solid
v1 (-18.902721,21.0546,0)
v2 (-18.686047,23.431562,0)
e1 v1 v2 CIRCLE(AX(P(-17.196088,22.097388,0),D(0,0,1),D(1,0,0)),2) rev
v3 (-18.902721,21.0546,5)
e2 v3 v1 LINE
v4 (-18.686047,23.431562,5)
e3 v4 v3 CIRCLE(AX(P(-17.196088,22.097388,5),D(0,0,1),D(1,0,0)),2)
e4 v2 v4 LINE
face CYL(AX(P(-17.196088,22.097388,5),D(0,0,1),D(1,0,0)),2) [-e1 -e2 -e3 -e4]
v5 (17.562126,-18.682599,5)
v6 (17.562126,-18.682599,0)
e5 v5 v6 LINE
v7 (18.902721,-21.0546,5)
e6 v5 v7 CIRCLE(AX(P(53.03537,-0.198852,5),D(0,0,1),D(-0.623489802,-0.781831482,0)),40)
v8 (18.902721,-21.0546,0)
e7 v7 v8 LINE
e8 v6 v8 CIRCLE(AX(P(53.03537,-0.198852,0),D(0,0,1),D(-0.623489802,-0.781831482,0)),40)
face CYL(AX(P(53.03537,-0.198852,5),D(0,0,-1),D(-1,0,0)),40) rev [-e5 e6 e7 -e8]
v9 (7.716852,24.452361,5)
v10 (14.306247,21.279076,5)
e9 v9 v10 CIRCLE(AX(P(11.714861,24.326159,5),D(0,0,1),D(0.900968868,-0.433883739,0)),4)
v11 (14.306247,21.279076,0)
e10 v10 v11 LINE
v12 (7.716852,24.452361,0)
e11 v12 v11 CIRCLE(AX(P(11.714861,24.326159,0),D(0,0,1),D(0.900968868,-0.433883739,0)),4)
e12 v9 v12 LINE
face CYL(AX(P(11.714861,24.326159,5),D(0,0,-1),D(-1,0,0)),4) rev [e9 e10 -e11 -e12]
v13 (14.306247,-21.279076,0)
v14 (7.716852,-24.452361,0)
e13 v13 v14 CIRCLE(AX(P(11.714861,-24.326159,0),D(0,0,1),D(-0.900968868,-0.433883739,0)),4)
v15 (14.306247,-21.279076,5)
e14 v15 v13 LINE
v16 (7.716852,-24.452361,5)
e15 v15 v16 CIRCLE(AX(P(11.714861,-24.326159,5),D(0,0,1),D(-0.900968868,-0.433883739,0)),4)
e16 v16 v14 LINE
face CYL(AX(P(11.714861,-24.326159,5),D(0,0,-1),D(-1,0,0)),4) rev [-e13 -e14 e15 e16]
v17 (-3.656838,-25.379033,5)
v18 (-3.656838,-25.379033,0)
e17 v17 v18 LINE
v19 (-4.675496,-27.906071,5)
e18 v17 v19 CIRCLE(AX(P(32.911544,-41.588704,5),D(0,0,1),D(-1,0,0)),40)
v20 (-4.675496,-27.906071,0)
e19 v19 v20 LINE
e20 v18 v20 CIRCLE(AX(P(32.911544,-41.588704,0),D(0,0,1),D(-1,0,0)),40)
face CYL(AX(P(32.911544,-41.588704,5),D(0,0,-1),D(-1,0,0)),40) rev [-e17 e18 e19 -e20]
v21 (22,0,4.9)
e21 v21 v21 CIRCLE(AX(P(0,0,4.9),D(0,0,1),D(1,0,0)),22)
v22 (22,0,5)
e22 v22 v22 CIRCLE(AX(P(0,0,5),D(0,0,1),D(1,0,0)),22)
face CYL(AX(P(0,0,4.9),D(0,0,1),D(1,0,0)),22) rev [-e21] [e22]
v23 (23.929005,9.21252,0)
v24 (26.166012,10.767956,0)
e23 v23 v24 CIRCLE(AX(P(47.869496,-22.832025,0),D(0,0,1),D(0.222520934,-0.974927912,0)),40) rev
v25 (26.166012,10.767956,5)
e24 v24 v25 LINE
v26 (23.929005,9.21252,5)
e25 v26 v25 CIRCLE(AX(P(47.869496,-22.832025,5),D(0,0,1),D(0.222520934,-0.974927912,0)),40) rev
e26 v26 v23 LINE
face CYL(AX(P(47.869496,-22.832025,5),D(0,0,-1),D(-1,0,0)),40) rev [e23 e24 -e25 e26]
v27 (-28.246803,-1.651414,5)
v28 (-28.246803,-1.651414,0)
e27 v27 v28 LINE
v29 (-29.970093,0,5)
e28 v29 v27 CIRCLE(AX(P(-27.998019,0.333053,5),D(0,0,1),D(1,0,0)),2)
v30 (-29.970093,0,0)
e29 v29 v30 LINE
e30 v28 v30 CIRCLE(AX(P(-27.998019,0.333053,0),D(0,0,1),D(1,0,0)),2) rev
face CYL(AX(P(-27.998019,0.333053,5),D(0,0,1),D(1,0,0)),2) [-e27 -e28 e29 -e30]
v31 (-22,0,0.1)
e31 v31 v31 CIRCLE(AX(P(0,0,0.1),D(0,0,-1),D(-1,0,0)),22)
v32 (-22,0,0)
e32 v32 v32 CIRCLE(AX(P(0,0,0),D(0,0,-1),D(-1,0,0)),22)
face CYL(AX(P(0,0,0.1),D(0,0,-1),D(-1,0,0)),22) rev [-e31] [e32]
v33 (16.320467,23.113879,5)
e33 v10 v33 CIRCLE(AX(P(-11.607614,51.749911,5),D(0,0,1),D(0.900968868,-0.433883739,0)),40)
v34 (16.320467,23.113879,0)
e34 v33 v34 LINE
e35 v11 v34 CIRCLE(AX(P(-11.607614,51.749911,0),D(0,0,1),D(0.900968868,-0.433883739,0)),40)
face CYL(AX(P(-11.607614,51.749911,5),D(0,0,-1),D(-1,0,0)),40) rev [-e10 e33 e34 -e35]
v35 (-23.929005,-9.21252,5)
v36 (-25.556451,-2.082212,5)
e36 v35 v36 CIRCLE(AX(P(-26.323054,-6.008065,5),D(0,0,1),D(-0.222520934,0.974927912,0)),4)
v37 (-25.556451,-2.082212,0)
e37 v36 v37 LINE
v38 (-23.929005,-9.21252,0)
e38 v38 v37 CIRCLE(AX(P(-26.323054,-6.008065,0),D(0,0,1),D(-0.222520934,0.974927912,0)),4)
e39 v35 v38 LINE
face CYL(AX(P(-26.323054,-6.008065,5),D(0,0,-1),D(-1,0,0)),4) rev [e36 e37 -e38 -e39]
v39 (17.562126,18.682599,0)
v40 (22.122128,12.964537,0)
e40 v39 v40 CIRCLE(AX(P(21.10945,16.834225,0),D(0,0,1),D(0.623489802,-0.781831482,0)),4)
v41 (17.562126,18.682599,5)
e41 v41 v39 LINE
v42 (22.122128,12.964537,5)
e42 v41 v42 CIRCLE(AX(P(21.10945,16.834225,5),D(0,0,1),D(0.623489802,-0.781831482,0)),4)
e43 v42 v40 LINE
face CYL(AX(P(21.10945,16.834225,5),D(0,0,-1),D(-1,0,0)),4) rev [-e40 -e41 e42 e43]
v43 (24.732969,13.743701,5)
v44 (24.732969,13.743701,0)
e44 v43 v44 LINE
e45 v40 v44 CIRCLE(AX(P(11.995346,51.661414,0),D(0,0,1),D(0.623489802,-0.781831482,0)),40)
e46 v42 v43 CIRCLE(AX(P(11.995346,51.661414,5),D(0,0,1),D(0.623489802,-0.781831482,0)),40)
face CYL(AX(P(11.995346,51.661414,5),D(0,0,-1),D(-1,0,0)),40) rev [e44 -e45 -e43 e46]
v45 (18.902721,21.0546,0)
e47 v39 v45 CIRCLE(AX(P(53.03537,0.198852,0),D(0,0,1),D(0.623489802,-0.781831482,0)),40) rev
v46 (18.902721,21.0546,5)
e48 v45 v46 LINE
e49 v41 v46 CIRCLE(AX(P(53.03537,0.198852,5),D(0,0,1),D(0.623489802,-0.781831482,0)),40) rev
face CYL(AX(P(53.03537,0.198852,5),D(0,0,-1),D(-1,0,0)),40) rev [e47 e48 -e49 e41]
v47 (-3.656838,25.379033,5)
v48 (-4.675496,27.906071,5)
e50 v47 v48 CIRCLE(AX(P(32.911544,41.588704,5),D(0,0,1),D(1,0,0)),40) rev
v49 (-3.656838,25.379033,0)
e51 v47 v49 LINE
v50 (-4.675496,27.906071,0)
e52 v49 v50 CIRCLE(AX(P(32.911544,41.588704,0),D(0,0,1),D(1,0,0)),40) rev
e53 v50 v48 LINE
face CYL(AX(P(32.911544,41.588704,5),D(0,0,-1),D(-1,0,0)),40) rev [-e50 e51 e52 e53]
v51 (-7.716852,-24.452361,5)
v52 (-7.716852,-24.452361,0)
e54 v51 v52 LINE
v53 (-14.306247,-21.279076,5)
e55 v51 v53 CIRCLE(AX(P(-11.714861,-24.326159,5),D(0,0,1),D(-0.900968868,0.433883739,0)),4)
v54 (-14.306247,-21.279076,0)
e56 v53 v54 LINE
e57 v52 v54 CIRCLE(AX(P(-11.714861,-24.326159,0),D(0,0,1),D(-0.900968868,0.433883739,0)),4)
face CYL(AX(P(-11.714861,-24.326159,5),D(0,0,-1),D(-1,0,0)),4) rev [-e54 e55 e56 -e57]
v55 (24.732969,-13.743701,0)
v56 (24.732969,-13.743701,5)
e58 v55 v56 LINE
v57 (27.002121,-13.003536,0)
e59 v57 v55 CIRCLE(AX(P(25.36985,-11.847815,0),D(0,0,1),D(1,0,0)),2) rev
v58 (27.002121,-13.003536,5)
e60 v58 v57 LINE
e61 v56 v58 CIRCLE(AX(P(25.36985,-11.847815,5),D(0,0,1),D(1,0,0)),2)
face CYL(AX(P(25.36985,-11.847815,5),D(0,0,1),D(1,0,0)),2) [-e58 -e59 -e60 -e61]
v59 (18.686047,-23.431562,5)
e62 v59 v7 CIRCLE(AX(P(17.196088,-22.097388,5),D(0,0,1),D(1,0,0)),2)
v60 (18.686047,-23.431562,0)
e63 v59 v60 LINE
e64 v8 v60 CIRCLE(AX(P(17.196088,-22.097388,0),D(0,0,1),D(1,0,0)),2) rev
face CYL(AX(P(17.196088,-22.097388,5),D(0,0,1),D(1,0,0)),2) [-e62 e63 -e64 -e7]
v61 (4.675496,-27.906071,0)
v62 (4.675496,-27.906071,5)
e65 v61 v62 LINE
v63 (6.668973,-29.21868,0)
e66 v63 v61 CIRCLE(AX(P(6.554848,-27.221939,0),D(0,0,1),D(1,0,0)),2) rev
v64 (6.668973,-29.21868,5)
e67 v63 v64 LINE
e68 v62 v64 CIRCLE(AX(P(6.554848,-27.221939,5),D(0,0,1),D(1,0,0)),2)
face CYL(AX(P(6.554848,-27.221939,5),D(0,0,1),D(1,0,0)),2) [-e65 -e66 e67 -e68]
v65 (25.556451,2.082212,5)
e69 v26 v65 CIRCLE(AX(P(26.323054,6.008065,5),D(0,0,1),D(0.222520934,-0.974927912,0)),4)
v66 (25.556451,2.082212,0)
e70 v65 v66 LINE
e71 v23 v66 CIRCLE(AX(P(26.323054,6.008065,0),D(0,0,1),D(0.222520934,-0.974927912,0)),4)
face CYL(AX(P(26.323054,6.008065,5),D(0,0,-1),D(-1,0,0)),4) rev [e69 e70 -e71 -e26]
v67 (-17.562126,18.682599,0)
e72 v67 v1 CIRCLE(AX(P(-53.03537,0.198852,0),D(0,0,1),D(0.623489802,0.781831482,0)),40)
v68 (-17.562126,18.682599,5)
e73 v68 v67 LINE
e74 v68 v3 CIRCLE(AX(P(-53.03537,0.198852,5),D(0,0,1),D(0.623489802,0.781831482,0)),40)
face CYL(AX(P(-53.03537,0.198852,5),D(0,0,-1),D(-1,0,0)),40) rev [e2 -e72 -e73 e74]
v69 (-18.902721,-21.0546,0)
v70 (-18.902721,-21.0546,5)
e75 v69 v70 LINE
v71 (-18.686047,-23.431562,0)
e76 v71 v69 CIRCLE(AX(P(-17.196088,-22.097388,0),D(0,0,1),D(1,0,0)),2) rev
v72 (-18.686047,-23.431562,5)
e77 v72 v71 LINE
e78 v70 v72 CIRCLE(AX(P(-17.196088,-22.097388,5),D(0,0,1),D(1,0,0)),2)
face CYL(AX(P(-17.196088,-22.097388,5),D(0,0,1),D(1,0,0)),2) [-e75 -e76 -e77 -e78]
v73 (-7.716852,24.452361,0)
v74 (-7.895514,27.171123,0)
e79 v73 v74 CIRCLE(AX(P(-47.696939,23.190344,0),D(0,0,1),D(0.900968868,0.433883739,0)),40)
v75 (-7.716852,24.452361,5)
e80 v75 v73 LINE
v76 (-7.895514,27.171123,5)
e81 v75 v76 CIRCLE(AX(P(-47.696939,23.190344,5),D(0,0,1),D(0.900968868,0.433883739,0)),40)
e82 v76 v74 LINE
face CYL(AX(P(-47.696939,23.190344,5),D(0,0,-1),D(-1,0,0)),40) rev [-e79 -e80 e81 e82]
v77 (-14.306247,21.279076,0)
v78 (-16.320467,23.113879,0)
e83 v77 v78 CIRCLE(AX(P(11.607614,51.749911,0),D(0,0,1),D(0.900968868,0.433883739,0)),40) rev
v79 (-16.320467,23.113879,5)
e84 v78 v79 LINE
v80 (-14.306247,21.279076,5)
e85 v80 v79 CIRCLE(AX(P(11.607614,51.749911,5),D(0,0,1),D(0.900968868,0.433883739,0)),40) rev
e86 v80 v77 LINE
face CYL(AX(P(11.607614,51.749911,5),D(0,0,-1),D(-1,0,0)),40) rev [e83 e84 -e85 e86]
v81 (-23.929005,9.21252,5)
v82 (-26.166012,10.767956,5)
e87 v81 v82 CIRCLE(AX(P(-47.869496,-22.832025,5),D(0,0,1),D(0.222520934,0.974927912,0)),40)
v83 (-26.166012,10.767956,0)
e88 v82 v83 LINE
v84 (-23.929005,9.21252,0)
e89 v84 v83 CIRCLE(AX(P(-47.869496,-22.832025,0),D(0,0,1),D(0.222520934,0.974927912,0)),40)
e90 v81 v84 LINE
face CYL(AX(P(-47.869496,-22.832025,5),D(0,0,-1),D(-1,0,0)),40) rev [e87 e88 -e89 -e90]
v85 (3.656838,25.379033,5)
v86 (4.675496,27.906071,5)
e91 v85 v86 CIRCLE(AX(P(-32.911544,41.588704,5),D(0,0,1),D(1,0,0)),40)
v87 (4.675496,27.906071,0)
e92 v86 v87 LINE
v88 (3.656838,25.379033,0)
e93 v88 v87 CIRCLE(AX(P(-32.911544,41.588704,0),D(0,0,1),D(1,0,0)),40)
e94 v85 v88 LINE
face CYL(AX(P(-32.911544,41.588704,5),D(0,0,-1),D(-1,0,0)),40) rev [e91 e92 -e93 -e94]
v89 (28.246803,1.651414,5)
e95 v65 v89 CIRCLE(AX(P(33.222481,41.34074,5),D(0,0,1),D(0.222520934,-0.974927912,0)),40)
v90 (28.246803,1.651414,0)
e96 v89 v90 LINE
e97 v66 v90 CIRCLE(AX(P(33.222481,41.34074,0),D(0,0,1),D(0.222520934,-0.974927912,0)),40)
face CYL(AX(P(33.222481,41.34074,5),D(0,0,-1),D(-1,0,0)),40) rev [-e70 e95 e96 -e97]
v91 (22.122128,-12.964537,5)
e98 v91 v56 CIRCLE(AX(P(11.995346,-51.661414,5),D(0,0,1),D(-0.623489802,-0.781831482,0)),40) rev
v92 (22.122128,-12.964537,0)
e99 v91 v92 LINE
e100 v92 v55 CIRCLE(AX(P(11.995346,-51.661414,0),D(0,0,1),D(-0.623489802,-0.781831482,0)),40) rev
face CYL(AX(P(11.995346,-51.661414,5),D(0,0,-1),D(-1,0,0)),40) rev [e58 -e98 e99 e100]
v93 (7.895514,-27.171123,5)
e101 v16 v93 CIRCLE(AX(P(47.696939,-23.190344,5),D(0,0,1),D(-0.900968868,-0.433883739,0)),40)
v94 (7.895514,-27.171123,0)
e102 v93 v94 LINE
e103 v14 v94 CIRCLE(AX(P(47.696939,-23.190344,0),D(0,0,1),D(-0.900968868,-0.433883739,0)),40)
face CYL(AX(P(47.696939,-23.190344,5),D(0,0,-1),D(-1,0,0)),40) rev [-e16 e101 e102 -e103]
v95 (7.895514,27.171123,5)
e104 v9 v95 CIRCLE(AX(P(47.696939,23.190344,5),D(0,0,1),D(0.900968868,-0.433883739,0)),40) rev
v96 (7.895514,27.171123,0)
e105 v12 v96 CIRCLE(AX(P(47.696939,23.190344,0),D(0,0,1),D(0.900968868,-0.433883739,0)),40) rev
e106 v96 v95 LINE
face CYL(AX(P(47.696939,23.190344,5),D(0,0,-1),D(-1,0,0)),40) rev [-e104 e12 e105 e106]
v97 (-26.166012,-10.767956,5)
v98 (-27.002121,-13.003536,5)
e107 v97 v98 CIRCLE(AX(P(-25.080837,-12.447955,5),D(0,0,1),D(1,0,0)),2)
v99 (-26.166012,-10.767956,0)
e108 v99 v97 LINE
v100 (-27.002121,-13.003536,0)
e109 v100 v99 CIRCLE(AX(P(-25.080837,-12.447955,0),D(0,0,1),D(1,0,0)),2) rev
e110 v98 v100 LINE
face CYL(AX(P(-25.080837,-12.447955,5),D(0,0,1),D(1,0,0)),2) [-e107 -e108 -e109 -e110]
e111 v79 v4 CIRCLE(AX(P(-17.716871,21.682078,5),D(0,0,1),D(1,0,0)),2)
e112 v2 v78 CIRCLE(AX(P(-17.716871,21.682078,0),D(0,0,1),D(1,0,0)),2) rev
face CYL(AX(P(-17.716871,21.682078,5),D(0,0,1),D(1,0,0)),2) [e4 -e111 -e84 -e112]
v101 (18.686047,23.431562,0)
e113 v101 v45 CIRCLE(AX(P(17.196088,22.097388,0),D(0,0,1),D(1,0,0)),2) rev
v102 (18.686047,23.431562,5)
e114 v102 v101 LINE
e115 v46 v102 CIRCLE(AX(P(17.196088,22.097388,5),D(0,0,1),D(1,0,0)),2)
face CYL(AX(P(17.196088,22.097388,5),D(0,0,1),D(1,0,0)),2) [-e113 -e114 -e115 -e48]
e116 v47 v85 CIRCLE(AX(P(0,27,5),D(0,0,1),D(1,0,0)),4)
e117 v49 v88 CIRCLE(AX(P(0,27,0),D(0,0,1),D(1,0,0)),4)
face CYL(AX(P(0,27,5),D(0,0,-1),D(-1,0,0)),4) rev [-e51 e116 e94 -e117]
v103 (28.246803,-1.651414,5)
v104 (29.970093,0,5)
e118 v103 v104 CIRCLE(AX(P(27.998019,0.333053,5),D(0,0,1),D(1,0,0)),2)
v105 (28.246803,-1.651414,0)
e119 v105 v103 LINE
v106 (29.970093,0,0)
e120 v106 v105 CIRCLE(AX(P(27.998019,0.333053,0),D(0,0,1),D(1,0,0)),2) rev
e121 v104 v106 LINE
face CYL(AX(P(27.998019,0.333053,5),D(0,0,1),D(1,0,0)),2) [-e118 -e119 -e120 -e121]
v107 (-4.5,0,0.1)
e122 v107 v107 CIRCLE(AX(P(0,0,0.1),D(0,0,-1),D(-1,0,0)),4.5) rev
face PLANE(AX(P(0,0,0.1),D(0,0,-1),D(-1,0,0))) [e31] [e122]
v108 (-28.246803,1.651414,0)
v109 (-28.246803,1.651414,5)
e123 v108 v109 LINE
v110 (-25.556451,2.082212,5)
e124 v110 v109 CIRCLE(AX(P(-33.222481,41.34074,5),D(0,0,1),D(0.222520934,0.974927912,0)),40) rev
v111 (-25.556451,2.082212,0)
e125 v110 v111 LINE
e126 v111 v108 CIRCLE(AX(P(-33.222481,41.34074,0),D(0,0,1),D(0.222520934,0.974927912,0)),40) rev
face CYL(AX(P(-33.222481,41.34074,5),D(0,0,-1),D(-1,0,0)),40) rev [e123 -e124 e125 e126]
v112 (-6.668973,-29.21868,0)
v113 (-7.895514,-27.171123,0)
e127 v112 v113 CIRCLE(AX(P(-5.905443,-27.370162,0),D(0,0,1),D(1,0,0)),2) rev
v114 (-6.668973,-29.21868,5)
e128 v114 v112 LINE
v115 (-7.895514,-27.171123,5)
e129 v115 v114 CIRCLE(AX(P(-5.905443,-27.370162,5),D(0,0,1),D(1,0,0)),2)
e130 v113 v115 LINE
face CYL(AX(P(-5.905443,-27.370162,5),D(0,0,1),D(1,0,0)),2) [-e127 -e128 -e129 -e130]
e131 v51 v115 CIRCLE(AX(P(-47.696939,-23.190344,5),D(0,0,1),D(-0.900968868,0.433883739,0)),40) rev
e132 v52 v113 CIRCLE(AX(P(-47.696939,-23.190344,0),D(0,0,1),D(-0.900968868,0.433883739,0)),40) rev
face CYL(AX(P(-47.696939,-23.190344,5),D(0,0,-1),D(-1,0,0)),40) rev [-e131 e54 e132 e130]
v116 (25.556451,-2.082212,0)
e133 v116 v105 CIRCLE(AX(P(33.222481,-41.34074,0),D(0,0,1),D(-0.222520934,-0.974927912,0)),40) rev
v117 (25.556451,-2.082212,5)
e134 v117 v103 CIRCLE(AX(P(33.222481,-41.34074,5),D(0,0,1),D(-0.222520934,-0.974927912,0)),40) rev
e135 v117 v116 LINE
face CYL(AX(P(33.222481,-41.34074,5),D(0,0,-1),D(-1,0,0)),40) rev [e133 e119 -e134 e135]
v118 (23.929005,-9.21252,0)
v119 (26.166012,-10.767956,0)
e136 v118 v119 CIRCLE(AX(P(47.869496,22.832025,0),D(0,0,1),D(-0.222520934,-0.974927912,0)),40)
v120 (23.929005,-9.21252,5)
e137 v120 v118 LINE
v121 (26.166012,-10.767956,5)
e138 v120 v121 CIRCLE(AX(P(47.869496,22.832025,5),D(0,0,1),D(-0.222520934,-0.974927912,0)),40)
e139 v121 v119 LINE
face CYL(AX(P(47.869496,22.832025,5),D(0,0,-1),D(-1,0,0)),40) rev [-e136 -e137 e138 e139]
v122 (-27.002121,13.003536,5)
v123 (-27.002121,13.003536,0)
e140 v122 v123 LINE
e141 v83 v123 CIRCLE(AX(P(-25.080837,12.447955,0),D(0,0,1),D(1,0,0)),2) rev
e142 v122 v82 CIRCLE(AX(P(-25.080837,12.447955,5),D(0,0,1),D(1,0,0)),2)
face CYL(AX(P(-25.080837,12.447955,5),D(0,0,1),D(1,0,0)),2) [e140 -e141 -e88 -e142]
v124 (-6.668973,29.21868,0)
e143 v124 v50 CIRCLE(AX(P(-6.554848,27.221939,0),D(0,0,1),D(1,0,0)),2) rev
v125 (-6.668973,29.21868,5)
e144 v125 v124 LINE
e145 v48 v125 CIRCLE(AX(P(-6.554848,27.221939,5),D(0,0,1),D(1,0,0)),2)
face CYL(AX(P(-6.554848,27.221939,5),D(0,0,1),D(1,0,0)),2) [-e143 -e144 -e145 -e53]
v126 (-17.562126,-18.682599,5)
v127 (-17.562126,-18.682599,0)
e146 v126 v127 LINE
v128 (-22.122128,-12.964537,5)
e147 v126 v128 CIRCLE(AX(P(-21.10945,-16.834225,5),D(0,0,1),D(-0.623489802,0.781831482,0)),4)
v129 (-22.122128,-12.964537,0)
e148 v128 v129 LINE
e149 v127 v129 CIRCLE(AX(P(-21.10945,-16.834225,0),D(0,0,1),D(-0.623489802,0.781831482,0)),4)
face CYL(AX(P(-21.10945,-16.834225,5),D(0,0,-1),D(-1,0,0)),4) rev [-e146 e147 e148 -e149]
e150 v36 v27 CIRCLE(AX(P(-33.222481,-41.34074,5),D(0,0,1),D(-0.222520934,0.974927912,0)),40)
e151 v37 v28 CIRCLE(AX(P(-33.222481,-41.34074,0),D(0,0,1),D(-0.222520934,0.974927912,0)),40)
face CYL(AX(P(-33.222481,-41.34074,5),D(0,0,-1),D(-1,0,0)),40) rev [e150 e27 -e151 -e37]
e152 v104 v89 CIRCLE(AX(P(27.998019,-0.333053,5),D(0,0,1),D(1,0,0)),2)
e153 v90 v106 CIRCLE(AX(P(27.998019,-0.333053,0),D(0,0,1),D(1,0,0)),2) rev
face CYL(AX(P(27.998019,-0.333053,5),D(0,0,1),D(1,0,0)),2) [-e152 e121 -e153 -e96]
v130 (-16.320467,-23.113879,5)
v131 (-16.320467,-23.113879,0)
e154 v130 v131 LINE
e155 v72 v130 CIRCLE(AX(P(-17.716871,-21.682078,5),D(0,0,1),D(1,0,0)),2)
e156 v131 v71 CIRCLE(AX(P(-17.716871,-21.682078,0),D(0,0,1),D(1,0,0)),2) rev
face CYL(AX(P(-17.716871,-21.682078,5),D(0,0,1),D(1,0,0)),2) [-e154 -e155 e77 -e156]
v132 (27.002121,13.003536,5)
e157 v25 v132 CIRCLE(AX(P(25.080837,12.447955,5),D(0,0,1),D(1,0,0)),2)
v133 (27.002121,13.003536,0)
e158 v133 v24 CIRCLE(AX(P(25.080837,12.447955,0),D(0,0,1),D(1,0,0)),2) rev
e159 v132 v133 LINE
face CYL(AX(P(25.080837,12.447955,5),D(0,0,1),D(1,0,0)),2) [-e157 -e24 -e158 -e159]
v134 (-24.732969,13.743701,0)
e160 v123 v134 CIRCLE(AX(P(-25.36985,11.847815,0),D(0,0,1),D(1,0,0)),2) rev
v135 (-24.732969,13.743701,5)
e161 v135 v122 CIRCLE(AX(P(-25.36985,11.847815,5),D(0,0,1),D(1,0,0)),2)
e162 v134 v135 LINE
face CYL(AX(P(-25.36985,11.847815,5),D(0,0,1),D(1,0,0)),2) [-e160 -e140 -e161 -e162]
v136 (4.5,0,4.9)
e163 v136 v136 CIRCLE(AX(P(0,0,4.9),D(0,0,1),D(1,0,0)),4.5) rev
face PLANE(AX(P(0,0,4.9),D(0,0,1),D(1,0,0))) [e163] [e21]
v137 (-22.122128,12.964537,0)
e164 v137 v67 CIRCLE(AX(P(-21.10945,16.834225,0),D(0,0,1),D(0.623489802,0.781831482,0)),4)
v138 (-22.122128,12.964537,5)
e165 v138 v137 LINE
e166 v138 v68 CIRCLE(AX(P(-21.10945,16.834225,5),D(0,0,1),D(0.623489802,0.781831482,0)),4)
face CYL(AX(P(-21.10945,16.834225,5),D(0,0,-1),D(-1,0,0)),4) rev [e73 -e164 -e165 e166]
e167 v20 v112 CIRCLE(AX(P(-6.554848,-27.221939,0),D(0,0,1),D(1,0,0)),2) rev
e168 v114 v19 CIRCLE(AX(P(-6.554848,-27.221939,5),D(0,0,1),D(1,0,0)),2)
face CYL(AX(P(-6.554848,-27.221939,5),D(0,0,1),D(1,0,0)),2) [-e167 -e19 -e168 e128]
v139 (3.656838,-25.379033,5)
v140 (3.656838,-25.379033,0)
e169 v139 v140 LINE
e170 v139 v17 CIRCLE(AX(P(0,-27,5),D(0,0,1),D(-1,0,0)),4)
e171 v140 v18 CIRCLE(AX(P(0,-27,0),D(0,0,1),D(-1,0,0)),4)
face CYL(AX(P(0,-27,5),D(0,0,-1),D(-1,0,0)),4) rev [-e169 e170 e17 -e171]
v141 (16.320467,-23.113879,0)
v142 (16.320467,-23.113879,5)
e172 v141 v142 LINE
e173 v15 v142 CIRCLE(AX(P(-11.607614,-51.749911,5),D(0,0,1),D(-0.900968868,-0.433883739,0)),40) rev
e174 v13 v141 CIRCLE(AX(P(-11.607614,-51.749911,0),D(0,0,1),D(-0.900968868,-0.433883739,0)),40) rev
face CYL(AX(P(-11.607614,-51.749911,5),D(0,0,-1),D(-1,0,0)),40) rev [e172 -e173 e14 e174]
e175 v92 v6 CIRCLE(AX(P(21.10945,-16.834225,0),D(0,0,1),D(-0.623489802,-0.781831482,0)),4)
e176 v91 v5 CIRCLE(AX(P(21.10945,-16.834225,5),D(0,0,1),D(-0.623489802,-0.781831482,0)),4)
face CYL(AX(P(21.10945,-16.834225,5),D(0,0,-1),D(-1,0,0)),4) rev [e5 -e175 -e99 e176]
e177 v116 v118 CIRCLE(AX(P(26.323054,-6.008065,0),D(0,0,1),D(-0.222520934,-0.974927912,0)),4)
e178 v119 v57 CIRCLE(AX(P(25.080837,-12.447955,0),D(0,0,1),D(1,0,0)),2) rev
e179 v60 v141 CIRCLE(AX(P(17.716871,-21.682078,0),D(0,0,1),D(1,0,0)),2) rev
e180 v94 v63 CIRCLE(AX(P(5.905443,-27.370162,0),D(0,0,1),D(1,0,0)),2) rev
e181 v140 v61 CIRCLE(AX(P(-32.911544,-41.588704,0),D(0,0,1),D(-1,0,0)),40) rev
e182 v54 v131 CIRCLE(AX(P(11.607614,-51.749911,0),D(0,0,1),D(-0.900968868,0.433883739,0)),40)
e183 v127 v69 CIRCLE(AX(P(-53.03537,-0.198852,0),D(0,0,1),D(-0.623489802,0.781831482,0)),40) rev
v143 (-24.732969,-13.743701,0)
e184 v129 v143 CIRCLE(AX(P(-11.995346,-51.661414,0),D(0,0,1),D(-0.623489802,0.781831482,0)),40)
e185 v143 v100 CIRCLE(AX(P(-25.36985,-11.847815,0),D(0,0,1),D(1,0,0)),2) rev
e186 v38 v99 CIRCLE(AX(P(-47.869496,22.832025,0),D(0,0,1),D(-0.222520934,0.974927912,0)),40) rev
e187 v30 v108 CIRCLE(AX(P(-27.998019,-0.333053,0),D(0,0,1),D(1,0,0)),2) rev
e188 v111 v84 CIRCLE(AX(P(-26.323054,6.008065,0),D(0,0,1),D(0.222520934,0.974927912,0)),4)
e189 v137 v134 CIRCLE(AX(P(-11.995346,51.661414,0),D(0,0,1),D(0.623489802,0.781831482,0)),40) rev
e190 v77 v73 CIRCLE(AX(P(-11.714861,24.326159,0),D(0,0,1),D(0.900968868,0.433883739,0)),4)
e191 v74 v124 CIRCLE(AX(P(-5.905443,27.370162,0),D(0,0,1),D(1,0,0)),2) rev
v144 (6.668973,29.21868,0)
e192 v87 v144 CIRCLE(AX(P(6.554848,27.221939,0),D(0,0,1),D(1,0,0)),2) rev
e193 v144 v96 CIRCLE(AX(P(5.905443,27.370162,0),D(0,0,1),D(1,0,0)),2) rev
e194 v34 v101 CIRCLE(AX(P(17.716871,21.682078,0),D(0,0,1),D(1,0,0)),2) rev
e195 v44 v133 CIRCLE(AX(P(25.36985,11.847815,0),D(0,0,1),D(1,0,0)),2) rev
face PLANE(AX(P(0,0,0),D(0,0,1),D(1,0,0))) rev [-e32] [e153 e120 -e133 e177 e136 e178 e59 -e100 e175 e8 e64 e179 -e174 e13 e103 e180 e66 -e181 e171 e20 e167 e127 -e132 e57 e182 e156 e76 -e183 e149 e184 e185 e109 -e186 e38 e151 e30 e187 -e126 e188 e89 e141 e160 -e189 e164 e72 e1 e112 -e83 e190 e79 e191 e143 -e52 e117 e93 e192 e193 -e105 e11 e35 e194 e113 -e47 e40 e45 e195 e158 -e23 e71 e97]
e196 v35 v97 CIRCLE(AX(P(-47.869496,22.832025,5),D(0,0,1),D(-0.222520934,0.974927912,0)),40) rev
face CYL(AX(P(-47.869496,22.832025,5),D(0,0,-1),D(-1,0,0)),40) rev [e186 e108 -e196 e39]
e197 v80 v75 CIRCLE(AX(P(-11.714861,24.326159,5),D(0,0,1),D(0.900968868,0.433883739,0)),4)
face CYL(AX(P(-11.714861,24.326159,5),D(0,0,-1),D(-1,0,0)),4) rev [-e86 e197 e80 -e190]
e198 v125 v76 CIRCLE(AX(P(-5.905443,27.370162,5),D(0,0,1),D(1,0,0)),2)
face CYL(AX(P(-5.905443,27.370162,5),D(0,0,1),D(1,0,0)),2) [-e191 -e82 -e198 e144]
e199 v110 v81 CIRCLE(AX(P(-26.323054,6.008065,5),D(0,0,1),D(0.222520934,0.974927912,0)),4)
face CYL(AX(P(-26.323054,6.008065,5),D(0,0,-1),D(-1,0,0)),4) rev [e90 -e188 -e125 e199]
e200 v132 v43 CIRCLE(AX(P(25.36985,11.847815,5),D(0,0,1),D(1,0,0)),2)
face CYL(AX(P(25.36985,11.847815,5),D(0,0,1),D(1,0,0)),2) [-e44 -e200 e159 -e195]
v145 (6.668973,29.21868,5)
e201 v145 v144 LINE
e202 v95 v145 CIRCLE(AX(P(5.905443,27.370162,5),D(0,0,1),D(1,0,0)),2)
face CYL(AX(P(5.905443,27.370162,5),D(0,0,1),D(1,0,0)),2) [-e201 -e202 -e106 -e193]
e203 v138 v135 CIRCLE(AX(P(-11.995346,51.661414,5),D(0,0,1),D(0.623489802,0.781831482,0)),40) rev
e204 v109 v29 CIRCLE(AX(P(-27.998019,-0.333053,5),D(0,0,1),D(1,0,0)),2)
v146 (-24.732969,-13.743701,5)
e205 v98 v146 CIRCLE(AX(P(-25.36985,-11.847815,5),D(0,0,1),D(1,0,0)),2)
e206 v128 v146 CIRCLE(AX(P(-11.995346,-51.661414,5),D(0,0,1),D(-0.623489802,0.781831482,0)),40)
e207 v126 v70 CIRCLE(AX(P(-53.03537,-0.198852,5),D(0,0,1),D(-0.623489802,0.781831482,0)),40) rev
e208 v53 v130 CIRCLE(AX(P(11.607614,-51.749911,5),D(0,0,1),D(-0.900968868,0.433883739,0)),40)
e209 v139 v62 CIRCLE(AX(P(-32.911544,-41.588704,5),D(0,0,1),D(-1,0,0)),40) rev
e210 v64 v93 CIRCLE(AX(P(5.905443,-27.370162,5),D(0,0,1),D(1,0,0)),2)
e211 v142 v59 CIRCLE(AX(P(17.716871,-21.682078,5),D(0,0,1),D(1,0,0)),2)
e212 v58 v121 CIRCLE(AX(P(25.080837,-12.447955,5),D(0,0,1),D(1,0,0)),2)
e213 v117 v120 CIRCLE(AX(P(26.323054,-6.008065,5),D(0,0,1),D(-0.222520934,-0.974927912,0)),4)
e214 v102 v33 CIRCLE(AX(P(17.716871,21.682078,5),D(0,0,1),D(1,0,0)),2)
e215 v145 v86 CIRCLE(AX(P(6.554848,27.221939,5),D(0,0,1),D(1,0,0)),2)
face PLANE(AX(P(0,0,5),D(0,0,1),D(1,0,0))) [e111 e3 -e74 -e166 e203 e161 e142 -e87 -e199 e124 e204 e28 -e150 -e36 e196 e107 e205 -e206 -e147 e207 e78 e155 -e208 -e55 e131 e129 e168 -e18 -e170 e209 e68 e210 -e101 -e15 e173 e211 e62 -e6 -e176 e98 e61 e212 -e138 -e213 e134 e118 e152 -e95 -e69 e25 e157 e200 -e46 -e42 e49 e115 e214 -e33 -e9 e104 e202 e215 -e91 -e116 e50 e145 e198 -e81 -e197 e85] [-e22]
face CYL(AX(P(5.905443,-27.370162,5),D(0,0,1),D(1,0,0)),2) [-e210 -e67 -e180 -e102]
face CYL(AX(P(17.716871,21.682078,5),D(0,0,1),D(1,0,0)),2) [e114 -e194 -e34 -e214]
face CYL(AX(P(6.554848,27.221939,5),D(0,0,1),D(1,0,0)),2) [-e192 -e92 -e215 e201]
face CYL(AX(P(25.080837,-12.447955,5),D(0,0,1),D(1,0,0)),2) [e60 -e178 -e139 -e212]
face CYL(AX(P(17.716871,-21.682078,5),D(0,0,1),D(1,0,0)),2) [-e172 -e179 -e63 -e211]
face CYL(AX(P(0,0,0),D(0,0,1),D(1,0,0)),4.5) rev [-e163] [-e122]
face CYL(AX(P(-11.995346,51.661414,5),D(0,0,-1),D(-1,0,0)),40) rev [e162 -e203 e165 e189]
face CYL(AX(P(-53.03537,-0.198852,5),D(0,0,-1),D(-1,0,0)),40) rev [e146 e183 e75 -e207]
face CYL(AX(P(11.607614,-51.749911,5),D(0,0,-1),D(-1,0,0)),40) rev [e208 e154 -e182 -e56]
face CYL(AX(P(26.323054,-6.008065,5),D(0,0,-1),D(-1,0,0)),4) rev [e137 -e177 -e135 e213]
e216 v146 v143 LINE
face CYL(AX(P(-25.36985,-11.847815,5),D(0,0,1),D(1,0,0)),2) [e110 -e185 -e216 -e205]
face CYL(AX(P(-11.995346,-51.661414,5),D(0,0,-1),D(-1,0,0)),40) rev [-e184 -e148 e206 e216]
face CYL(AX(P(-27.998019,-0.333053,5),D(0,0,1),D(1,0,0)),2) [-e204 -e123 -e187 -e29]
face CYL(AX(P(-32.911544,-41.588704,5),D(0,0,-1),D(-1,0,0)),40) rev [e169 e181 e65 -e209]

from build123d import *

# Parameters (mm, degrees)
SKETCH_1_R               = 30
EXTRUDE_1_DEPTH          = 5
SKETCH_2_R               = 4.5
CUT_EXTRUDE_1_DEPTH      = 43.720018727
CUT_EXTRUDE_7_DEPTH      = 43.720018727
PATTERN_CIRCULAR_1_COUNT = 14
FILLET_3_R               = 2
SKETCH_4_R               = 22
CUT_EXTRUDE_9_DEPTH      = 0.1
CUT_EXTRUDE_START        = -0.1
SKETCH_5_R               = 22
CUT_EXTRUDE_10_DEPTH     = 0.1


with BuildPart() as part:
    # 草图1 → 凸台-拉伸1 (new body)
    with BuildSketch(Plane.XY):
        Circle(SKETCH_1_R)
    extrude(amount=EXTRUDE_1_DEPTH)

    # 草图2 → 切除-拉伸1 (cut, through all)
    with BuildSketch(Plane.XY.offset(5)):
        Circle(SKETCH_2_R)
    extrude(amount=-CUT_EXTRUDE_1_DEPTH, mode=Mode.SUBTRACT)

    # 草图3 → 切除-拉伸7 (cut, through all)
    with BuildSketch(Plane.XY):
        with BuildLine():
            Line((0, 23), (0, 30))
            ThreePointArc((0, 30), (-2.625482426, 29.884893208), (-5.230817461, 29.540456135))
            ThreePointArc((-5.230817461, 29.540456135), (-4.501731259, 27.437843644), (-3.656838203, 25.379032895))
            ThreePointArc((-3.656838203, 25.379032895), (-2.181299106, 23.647100626), (0, 23))
        make_face()
        with BuildLine():
            ThreePointArc((5.230817461, 29.540456135), (2.625482426, 29.884893208), (0, 30))
            Line((0, 30), (0, 23))
            ThreePointArc((0, 23), (2.181299106, 23.647100626), (3.656838203, 25.379032895))
            ThreePointArc((3.656838203, 25.379032895), (4.501731259, 27.437843644), (5.230817461, 29.540456135))
        make_face()
    cut_extrude_7 = extrude(amount=CUT_EXTRUDE_7_DEPTH, mode=Mode.SUBTRACT)

    # 阵列(圆周)1: 切除-拉伸7 ×14 about axis
    pattern_circular_1_axis = Axis((0, 0, 0), (0, 0, 1))
    for i in range(1, PATTERN_CIRCULAR_1_COUNT):
        add(cut_extrude_7.rotate(pattern_circular_1_axis, i * 360 / PATTERN_CIRCULAR_1_COUNT), mode=Mode.SUBTRACT)

    # 圆角3
    # the kernel refuses this fillet: 2 mm, written as the material it takes off along each edge
    with BuildSketch(Plane(origin=(5.230817461, 29.540456135, -4.577149267), x_dir=(-0.32171090906550515, -0.9468379433610834, 0), z_dir=(0, 0, 1)), Plane(origin=(-19.834297271, 22.507790913, -4.577149267), x_dir=(0.5396842419659282, -0.8418675186593562, 0), z_dir=(0, 0, 1)), Plane(origin=(-27.635848838, 11.673039835, -4.577149267), x_dir=(0.8515113273463623, -0.5243362083633328, 0), z_dir=(0, 0, 1)), Plane(origin=(-29.963781612, -1.473699943, -4.577149267), x_dir=(0.9946861512447445, -0.10295368143936073, 0), z_dir=(0, 0, 1)), Plane(origin=(-26.357019955, -14.328555373, -4.577149267), x_dir=(0.9408511838640222, 0.33882008473770825, 0), z_dir=(0, 0, 1)), Plane(origin=(-17.529927249, -24.345464683, -4.577149267), x_dir=(0.7006691007364907, 0.7134863777768412, 0), z_dir=(0, 0, 1)), Plane(origin=(-5.230817461, -29.540456135, -4.577149267), x_dir=(0.32171090906550703, 0.9468379433610828, 0), z_dir=(0, 0, 1)), Plane(origin=(8.104319877, -28.88459796, -4.577149267), x_dir=(-0.12096607367127866, 0.9926566420573404, 0), z_dir=(0, 0, 1)), Plane(origin=(19.834297271, -22.507790913, -4.577149267), x_dir=(-0.5396842419659312, 0.8418675186593543, 0), z_dir=(0, 0, 1)), Plane(origin=(27.635848838, -11.673039835, -4.577149267), x_dir=(-0.8515113273463634, 0.524336208363331, 0), z_dir=(0, 0, 1)), Plane(origin=(29.963781612, 1.473699943, -4.577149267), x_dir=(-0.9946861512447445, 0.10295368143936018, 0), z_dir=(0, 0, 1)), Plane(origin=(26.357019955, 14.328555373, -4.577149267), x_dir=(-0.9408511838640224, -0.3388200847377076, 0), z_dir=(0, 0, 1)), Plane(origin=(17.529927249, 24.345464683, -4.577149267), x_dir=(-0.7006691007364938, -0.7134863777768381, 0), z_dir=(0, 0, 1))) as fillet_3_piece_1:
        with BuildLine():
            CenterArc((1.769304863, 1.999534384), FILLET_3_R, 185.227747584, 83.53589182)
            ThreePointArc((-0.222375917, 1.817304657), (-0.125054645, 0.906955521), (0, 0))
            ThreePointArc((0, 0), (0.863075543, 0.009312326), (1.726151086, 0))
        make_face()
    extrude(amount=14.154298534, mode=Mode.SUBTRACT)
    with BuildSketch(Plane(origin=(-5.230817461, 29.540456135, -4.577149267), x_dir=(-0.9789028377703077, -0.20432629347501635, 0), z_dir=(0, 0, 1)), Plane(origin=(-17.529927249, 24.345464683, -4.577149267), x_dir=(-0.7933071253194062, -0.6088216527994549, 0), z_dir=(0, 0, 1)), Plane(origin=(-26.357019955, 14.328555373, -4.577149267), x_dir=(-0.4505872074255905, -0.8927324170793888, 0), z_dir=(0, 0, 1)), Plane(origin=(-29.963781612, 1.473699943, -4.577149267), x_dir=(-0.018622967011686854, -0.9998265775121612, 0), z_dir=(0, 0, 1)), Plane(origin=(-27.635848838, -11.673039835, -4.577149267), x_dir=(0.4170297804145827, -0.9088928222003764, 0), z_dir=(0, 0, 1)), Plane(origin=(-19.834297271, -22.507790913, -4.577149267), x_dir=(0.7700846652951304, -0.6379416966128542, 0), z_dir=(0, 0, 1)), Plane(origin=(-8.104319877, -28.88459796, -4.577149267), x_dir=(0.9706148377453508, -0.24063839416968846, 0), z_dir=(0, 0, 1)), Plane(origin=(5.230817461, -29.540456135, -4.577149267), x_dir=(0.9789028377703077, 0.20432629347501674, 0), z_dir=(0, 0, 1)), Plane(origin=(17.529927249, -24.345464683, -4.577149267), x_dir=(0.7933071253194082, 0.6088216527994523, 0), z_dir=(0, 0, 1)), Plane(origin=(26.357019955, -14.328555373, -4.577149267), x_dir=(0.45058720742559166, 0.8927324170793882, 0), z_dir=(0, 0, 1)), Plane(origin=(29.963781612, -1.473699943, -4.577149267), x_dir=(0.01862296701168685, 0.9998265775121612, 0), z_dir=(0, 0, 1)), Plane(origin=(27.635848838, 11.673039835, -4.577149267), x_dir=(-0.4170297804145869, 0.9088928222003745, 0), z_dir=(0, 0, 1)), Plane(origin=(19.834297271, 22.507790913, -4.577149267), x_dir=(-0.7700846652951312, 0.6379416966128533, 0), z_dir=(0, 0, 1)), Plane(origin=(8.104319877, 28.88459796, -4.577149267), x_dir=(-0.9706148377453518, 0.24063839416968458, 0), z_dir=(0, 0, 1))) as fillet_3_piece_2:
        with BuildLine():
            CenterArc((1.76983105, 1.999068659), FILLET_3_R, 188.212721849, 83.53589182)
            ThreePointArc((-0.209658025, 1.713371262), (-0.095585631, 0.857816705), (0, 0))
            ThreePointArc((0, 0), (0.915429853, -0.013970116), (1.830859707, 0))
        make_face()
    extrude(amount=14.154298534, mode=Mode.SUBTRACT)
    with BuildSketch(Plane(origin=(-8.104319877, 28.88459796, -4.577149267), x_dir=(0.9706148377453514, 0.24063839416968652, 0), z_dir=(0, 0, 1))) as fillet_3_piece_3:
        with BuildLine():
            CenterArc((1.76983105, -1.999068659), FILLET_3_R, 88.251386331, 83.53589182)
            ThreePointArc((-0.209658025, -1.713371262), (-0.095585631, -0.857816705), (0, 0))
            ThreePointArc((0, 0), (0.915429853, 0.013970116), (1.830859707, 0))
        make_face()
    extrude(amount=14.154298534, mode=Mode.SUBTRACT)

    # 草图4 → 切除-拉伸9 (cut)
    with BuildSketch(Plane.XY.offset(5)):
        Circle(SKETCH_4_R)
    extrude(amount=-CUT_EXTRUDE_9_DEPTH, mode=Mode.SUBTRACT)

    # 草图5 → 切除-拉伸10 (cut)
    with BuildSketch(Plane(origin=(0, 0, 0), x_dir=(-1, 0, 0), z_dir=(0, 0, -1)).offset(CUT_EXTRUDE_START)):
        with Locations(Location((0, 0, 0), (0, 0, 180))):
            Circle(SKETCH_5_R)
    extrude(amount=CUT_EXTRUDE_10_DEPTH, mode=Mode.SUBTRACT)


solid = part.part
